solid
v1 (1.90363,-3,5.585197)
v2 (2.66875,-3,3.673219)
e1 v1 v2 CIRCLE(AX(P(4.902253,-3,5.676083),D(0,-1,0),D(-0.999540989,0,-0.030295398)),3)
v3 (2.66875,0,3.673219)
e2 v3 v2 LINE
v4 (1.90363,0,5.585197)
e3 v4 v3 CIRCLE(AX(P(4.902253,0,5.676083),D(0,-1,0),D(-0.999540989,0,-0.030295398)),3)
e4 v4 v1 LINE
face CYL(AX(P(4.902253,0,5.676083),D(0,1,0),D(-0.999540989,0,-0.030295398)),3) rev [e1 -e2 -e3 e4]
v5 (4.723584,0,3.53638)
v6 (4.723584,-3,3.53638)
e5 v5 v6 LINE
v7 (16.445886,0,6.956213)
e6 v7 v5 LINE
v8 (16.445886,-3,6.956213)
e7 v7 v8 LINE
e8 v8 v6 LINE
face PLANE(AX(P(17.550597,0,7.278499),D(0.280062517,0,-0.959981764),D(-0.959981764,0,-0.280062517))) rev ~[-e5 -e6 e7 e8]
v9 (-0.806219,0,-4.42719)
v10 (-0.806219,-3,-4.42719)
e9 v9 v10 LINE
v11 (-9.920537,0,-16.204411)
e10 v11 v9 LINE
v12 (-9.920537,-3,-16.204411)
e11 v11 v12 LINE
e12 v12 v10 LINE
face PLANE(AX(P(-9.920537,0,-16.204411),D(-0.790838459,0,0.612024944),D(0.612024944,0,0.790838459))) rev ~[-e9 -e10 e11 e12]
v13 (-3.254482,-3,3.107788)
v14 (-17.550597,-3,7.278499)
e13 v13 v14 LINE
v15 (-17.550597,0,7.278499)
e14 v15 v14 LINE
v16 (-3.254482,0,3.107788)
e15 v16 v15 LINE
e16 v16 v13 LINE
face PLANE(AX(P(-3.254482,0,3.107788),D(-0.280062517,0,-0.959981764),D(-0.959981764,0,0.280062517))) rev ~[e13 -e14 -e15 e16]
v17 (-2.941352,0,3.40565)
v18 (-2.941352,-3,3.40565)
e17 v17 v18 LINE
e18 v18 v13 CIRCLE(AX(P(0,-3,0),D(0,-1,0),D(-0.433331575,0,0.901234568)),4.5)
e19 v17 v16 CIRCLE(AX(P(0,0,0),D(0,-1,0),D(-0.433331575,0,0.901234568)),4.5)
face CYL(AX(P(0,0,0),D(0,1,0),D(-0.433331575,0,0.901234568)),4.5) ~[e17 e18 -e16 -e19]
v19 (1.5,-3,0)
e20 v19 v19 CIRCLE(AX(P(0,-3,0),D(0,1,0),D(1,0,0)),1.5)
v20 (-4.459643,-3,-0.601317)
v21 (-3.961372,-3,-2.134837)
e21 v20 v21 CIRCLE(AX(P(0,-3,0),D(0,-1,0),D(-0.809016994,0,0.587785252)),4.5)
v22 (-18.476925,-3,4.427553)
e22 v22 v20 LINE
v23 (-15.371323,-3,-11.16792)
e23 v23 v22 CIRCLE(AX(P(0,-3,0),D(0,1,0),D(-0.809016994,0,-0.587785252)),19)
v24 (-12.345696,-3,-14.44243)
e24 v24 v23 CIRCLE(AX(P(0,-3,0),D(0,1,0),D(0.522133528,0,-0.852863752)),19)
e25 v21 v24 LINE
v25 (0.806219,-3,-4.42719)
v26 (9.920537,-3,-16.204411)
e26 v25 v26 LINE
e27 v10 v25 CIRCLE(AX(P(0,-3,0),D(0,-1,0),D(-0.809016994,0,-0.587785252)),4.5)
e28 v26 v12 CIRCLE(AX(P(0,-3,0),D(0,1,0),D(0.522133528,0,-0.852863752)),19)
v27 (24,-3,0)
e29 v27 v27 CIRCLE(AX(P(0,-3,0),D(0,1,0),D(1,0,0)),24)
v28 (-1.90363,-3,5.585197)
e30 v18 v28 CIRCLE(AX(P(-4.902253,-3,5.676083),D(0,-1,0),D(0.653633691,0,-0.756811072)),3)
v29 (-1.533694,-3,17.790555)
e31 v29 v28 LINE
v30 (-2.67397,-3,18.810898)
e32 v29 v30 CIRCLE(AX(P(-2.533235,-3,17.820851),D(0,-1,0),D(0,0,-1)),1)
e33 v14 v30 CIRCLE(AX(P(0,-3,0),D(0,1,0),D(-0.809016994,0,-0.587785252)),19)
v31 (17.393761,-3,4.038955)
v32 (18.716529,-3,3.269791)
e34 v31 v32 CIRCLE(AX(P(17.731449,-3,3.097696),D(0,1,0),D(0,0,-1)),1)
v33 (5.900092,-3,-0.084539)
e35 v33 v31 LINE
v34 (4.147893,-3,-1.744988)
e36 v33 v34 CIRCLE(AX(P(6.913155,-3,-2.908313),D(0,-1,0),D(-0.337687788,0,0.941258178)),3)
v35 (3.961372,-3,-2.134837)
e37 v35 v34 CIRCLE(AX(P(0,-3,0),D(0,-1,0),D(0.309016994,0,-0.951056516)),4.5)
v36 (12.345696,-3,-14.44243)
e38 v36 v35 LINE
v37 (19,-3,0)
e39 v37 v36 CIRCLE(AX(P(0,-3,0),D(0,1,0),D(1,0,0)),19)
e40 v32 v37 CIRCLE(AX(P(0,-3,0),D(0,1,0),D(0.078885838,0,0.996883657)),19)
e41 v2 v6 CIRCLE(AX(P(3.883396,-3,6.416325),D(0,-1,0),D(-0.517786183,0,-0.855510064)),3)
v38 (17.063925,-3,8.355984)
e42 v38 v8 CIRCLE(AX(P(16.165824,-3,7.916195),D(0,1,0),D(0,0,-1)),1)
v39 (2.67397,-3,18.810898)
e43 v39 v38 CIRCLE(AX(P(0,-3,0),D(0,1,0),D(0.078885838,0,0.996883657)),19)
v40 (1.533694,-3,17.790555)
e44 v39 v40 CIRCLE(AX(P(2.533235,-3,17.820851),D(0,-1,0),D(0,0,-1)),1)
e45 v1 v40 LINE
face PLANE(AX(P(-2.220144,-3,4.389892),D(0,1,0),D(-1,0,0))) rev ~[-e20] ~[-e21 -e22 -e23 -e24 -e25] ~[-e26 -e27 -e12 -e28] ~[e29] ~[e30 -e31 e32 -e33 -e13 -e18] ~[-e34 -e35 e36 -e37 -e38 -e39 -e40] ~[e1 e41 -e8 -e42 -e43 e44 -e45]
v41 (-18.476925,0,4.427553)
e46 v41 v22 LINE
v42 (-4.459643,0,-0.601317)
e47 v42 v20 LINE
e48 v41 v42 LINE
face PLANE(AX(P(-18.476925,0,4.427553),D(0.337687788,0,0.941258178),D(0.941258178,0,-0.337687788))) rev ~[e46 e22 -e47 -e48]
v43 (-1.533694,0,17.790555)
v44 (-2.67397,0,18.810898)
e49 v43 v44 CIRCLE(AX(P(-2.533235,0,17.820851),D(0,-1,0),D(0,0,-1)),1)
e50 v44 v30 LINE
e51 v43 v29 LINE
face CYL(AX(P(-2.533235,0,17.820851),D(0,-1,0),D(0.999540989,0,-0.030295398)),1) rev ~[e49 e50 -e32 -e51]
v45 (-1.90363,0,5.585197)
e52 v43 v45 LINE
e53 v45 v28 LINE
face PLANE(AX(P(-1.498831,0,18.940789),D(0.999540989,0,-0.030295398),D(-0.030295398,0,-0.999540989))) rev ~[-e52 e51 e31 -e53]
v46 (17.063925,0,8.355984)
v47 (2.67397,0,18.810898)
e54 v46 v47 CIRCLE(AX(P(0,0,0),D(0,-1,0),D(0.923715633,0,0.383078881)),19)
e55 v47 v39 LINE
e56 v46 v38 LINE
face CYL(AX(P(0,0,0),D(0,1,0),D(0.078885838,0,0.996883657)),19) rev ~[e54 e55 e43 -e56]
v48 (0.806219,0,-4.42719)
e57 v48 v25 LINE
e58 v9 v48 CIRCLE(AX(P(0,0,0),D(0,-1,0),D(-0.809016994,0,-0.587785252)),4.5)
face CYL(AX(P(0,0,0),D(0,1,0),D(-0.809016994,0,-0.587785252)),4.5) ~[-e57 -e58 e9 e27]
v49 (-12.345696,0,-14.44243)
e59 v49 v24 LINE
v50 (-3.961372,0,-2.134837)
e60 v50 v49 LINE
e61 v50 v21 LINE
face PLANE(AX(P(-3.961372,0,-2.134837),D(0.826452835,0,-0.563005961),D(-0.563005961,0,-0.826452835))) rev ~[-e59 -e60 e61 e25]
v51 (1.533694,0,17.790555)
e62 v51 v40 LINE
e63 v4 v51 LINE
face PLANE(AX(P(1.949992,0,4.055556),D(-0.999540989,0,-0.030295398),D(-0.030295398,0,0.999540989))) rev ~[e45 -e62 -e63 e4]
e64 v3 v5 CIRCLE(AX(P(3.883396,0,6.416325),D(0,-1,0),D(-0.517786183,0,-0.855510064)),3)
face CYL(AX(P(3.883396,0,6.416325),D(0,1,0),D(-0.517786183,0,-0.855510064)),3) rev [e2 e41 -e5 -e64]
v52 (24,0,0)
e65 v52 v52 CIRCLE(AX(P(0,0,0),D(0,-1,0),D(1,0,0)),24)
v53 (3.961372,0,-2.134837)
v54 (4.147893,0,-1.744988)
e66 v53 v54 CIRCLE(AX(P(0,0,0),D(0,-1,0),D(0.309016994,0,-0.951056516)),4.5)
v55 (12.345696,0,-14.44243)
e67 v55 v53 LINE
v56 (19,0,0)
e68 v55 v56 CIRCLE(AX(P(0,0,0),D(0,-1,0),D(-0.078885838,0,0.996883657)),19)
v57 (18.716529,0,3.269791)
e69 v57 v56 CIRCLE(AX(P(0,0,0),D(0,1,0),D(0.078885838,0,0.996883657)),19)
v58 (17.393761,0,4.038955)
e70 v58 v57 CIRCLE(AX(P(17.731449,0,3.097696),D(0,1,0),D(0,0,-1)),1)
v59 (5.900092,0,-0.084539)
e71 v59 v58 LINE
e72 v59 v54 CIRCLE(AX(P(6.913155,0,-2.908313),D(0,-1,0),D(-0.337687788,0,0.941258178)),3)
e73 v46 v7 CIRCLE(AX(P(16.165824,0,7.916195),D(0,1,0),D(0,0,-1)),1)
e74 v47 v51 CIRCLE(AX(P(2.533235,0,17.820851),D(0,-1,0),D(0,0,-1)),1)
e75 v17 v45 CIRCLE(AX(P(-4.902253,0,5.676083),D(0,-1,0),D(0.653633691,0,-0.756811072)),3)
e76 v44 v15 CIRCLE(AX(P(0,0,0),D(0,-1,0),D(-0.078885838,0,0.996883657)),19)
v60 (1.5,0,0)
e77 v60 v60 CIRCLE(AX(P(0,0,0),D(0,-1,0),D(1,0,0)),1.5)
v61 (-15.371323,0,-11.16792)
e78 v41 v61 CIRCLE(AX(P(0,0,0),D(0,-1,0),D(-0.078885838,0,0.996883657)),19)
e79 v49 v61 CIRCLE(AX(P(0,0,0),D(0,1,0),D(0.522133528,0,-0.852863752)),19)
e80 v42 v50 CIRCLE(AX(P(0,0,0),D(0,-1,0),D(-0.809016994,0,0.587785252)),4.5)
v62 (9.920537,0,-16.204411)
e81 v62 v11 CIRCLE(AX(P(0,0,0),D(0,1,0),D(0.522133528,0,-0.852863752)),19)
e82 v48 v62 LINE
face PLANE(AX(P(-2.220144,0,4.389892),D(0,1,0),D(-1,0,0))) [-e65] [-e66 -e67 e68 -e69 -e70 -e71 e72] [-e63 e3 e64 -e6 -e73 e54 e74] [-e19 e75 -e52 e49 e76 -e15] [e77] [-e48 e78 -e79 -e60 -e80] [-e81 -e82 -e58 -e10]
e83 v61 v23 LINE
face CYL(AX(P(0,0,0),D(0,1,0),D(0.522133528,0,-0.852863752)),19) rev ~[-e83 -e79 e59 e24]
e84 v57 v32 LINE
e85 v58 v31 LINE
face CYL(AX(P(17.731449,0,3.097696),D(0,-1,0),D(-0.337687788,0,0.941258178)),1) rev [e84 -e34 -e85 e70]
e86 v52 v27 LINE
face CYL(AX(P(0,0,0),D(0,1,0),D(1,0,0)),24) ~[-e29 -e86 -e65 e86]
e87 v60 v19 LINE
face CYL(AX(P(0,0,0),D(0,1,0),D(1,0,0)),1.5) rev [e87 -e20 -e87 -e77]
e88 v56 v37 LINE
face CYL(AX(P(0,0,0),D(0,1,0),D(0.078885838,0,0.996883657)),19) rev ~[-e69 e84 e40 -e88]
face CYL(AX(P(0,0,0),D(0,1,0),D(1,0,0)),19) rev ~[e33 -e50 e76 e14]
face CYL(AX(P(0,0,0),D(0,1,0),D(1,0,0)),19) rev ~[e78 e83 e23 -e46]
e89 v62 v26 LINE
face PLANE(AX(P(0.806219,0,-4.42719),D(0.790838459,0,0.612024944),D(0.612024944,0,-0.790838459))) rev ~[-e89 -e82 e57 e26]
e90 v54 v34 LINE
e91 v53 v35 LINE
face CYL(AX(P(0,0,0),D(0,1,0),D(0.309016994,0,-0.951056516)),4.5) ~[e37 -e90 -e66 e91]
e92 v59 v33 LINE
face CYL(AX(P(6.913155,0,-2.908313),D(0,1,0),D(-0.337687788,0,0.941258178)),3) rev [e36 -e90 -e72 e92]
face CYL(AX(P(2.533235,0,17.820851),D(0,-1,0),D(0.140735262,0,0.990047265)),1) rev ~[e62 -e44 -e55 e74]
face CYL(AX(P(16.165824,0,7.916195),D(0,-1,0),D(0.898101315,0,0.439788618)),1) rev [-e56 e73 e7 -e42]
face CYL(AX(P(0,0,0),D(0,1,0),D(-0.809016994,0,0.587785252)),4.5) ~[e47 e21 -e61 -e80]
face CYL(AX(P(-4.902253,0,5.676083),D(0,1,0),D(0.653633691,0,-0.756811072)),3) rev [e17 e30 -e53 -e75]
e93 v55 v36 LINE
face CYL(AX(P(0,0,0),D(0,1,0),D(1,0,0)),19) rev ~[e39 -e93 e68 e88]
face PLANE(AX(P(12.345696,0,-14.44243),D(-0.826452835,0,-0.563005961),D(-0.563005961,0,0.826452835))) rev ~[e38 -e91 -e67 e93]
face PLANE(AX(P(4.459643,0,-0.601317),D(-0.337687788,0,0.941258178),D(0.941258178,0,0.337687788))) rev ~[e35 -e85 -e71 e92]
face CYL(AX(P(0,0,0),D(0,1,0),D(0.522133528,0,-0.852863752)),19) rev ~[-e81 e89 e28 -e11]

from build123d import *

# Parameters (mm, degrees)
F0_R        = 24
F0_R_2      = 1.5
F1_DEPTH    = 3
F2_COUNT    = 5
F3_T1_DEPTH = 3
F4_R        = 1


# Not quite as in the source:
# - a fillet or chamfer that OpenCascade refuses, or shapes differently, is made with other operations: its cross-section is extruded or revolved along the edge and cut away or added


with BuildPart() as f1:
    # F0 (on Front) → F1 (new body)
    with BuildSketch(Plane.XZ):
        Circle(F0_R)
        with BuildLine():
            ThreePointArc((-1.4988309156, 18.9407894737), (0, 19), (1.4988309156, 18.9407894737))
            ThreePointArc((1.4988309156, 18.9407894737), (13.9548878067, 12.8942276349), (19, 0))
            ThreePointArc((19, 0), (-12.8942276349, -13.9548878067), (-1.4988309156, 18.9407894737))
        make_face(mode=Mode.SUBTRACT)
        with BuildLine():
            ThreePointArc((-1.9499920861, 4.0555555556), (-2.3953116303, -3.8095251927), (4.5, 0))
            ThreePointArc((4.5, 0), (3.8095251927, 2.3953116303), (1.9499920861, 4.0555555556))
            ThreePointArc((1.9499920861, 4.0555555556), (0, 4.5), (-1.9499920861, 4.0555555556))
        make_face()
        Circle(F0_R_2, mode=Mode.SUBTRACT)
        with BuildLine():
            ThreePointArc((-1.9499920861, 4.0555555556), (0, 4.5), (1.9499920861, 4.0555555556))
            Line((1.9499920861, 4.0555555556), (1.4988309156, 18.9407894737))
            ThreePointArc((1.4988309156, 18.9407894737), (0, 19), (-1.4988309156, 18.9407894737))
            Line((-1.4988309156, 18.9407894737), (-1.9499920861, 4.0555555556))
        make_face()
    extrude(amount=F1_DEPTH)

    # F2: F1 ×5 about axis
    f2_axis = Axis((0, 0, 0), (0, 1, 0))


with BuildPart() as f1_1:
    add(f1.part)
    for i in range(1, F2_COUNT):
        add(f1.part.rotate(f2_axis, i * 360 / F2_COUNT))

    # F3: fillet of radius 3 on 4 edges, made by hand

    # F3_s2 → F3_t1 (join)
    with BuildSketch(Plane.XZ):
        with BuildLine():
            ThreePointArc((-2.9413516087, 3.4056498225), (-2.1935950838, 4.3864419946), (-1.903629714, 5.5851968442))
            Line((-1.903629714, 5.5851968442), (-1.9499920861, 4.0555555556))
            ThreePointArc((-1.9499920861, 4.0555555556), (-2.467165408, 3.7633887454), (-2.9413516087, 3.4056498225))
        make_face()
        with BuildLine():
            ThreePointArc((2.3300378224, 3.8497952863), (3.4938960826, 3.4417180197), (4.7235839209, 3.5363801859))
            Line((4.7235839209, 3.5363801859), (3.2544818448, 3.1077882685))
            ThreePointArc((3.2544818448, 3.1077882685), (2.8167993507, 3.5093648169), (2.3300378224, 3.8497952863))
        make_face()
        with BuildLine():
            ThreePointArc((1.903629714, 5.5851968442), (2.1935950838, 4.3864419946), (2.9413516087, 3.4056498225))
            ThreePointArc((2.9413516087, 3.4056498225), (2.467165408, 3.7633887454), (1.9499920861, 4.0555555556))
            Line((1.9499920861, 4.0555555556), (1.903629714, 5.5851968442))
        make_face()
        with BuildLine():
            ThreePointArc((5.9000917861, -0.0845387023), (4.8496124019, -0.7307477774), (4.1478930895, -1.7449879421))
            ThreePointArc((4.1478930895, -1.7449879421), (4.3415914287, -1.1834626593), (4.4596432318, -0.6013170919))
            Line((4.4596432318, -0.6013170919), (5.9000917861, -0.0845387023))
        make_face()
    extrude(amount=F3_T1_DEPTH)

    # F4
    f4_edges = [f1_1.edges().sort_by_distance(p)[0] for p in [
        (-1.498831, -1.5, 18.940789),
        (17.550597, -1.5, 7.278499),
        (18.476925, -1.5, 4.427553),
        (1.498831, -1.5, 18.940789),
    ]]
    fillet(f4_edges, radius=F4_R)


solid = f1_1.part
